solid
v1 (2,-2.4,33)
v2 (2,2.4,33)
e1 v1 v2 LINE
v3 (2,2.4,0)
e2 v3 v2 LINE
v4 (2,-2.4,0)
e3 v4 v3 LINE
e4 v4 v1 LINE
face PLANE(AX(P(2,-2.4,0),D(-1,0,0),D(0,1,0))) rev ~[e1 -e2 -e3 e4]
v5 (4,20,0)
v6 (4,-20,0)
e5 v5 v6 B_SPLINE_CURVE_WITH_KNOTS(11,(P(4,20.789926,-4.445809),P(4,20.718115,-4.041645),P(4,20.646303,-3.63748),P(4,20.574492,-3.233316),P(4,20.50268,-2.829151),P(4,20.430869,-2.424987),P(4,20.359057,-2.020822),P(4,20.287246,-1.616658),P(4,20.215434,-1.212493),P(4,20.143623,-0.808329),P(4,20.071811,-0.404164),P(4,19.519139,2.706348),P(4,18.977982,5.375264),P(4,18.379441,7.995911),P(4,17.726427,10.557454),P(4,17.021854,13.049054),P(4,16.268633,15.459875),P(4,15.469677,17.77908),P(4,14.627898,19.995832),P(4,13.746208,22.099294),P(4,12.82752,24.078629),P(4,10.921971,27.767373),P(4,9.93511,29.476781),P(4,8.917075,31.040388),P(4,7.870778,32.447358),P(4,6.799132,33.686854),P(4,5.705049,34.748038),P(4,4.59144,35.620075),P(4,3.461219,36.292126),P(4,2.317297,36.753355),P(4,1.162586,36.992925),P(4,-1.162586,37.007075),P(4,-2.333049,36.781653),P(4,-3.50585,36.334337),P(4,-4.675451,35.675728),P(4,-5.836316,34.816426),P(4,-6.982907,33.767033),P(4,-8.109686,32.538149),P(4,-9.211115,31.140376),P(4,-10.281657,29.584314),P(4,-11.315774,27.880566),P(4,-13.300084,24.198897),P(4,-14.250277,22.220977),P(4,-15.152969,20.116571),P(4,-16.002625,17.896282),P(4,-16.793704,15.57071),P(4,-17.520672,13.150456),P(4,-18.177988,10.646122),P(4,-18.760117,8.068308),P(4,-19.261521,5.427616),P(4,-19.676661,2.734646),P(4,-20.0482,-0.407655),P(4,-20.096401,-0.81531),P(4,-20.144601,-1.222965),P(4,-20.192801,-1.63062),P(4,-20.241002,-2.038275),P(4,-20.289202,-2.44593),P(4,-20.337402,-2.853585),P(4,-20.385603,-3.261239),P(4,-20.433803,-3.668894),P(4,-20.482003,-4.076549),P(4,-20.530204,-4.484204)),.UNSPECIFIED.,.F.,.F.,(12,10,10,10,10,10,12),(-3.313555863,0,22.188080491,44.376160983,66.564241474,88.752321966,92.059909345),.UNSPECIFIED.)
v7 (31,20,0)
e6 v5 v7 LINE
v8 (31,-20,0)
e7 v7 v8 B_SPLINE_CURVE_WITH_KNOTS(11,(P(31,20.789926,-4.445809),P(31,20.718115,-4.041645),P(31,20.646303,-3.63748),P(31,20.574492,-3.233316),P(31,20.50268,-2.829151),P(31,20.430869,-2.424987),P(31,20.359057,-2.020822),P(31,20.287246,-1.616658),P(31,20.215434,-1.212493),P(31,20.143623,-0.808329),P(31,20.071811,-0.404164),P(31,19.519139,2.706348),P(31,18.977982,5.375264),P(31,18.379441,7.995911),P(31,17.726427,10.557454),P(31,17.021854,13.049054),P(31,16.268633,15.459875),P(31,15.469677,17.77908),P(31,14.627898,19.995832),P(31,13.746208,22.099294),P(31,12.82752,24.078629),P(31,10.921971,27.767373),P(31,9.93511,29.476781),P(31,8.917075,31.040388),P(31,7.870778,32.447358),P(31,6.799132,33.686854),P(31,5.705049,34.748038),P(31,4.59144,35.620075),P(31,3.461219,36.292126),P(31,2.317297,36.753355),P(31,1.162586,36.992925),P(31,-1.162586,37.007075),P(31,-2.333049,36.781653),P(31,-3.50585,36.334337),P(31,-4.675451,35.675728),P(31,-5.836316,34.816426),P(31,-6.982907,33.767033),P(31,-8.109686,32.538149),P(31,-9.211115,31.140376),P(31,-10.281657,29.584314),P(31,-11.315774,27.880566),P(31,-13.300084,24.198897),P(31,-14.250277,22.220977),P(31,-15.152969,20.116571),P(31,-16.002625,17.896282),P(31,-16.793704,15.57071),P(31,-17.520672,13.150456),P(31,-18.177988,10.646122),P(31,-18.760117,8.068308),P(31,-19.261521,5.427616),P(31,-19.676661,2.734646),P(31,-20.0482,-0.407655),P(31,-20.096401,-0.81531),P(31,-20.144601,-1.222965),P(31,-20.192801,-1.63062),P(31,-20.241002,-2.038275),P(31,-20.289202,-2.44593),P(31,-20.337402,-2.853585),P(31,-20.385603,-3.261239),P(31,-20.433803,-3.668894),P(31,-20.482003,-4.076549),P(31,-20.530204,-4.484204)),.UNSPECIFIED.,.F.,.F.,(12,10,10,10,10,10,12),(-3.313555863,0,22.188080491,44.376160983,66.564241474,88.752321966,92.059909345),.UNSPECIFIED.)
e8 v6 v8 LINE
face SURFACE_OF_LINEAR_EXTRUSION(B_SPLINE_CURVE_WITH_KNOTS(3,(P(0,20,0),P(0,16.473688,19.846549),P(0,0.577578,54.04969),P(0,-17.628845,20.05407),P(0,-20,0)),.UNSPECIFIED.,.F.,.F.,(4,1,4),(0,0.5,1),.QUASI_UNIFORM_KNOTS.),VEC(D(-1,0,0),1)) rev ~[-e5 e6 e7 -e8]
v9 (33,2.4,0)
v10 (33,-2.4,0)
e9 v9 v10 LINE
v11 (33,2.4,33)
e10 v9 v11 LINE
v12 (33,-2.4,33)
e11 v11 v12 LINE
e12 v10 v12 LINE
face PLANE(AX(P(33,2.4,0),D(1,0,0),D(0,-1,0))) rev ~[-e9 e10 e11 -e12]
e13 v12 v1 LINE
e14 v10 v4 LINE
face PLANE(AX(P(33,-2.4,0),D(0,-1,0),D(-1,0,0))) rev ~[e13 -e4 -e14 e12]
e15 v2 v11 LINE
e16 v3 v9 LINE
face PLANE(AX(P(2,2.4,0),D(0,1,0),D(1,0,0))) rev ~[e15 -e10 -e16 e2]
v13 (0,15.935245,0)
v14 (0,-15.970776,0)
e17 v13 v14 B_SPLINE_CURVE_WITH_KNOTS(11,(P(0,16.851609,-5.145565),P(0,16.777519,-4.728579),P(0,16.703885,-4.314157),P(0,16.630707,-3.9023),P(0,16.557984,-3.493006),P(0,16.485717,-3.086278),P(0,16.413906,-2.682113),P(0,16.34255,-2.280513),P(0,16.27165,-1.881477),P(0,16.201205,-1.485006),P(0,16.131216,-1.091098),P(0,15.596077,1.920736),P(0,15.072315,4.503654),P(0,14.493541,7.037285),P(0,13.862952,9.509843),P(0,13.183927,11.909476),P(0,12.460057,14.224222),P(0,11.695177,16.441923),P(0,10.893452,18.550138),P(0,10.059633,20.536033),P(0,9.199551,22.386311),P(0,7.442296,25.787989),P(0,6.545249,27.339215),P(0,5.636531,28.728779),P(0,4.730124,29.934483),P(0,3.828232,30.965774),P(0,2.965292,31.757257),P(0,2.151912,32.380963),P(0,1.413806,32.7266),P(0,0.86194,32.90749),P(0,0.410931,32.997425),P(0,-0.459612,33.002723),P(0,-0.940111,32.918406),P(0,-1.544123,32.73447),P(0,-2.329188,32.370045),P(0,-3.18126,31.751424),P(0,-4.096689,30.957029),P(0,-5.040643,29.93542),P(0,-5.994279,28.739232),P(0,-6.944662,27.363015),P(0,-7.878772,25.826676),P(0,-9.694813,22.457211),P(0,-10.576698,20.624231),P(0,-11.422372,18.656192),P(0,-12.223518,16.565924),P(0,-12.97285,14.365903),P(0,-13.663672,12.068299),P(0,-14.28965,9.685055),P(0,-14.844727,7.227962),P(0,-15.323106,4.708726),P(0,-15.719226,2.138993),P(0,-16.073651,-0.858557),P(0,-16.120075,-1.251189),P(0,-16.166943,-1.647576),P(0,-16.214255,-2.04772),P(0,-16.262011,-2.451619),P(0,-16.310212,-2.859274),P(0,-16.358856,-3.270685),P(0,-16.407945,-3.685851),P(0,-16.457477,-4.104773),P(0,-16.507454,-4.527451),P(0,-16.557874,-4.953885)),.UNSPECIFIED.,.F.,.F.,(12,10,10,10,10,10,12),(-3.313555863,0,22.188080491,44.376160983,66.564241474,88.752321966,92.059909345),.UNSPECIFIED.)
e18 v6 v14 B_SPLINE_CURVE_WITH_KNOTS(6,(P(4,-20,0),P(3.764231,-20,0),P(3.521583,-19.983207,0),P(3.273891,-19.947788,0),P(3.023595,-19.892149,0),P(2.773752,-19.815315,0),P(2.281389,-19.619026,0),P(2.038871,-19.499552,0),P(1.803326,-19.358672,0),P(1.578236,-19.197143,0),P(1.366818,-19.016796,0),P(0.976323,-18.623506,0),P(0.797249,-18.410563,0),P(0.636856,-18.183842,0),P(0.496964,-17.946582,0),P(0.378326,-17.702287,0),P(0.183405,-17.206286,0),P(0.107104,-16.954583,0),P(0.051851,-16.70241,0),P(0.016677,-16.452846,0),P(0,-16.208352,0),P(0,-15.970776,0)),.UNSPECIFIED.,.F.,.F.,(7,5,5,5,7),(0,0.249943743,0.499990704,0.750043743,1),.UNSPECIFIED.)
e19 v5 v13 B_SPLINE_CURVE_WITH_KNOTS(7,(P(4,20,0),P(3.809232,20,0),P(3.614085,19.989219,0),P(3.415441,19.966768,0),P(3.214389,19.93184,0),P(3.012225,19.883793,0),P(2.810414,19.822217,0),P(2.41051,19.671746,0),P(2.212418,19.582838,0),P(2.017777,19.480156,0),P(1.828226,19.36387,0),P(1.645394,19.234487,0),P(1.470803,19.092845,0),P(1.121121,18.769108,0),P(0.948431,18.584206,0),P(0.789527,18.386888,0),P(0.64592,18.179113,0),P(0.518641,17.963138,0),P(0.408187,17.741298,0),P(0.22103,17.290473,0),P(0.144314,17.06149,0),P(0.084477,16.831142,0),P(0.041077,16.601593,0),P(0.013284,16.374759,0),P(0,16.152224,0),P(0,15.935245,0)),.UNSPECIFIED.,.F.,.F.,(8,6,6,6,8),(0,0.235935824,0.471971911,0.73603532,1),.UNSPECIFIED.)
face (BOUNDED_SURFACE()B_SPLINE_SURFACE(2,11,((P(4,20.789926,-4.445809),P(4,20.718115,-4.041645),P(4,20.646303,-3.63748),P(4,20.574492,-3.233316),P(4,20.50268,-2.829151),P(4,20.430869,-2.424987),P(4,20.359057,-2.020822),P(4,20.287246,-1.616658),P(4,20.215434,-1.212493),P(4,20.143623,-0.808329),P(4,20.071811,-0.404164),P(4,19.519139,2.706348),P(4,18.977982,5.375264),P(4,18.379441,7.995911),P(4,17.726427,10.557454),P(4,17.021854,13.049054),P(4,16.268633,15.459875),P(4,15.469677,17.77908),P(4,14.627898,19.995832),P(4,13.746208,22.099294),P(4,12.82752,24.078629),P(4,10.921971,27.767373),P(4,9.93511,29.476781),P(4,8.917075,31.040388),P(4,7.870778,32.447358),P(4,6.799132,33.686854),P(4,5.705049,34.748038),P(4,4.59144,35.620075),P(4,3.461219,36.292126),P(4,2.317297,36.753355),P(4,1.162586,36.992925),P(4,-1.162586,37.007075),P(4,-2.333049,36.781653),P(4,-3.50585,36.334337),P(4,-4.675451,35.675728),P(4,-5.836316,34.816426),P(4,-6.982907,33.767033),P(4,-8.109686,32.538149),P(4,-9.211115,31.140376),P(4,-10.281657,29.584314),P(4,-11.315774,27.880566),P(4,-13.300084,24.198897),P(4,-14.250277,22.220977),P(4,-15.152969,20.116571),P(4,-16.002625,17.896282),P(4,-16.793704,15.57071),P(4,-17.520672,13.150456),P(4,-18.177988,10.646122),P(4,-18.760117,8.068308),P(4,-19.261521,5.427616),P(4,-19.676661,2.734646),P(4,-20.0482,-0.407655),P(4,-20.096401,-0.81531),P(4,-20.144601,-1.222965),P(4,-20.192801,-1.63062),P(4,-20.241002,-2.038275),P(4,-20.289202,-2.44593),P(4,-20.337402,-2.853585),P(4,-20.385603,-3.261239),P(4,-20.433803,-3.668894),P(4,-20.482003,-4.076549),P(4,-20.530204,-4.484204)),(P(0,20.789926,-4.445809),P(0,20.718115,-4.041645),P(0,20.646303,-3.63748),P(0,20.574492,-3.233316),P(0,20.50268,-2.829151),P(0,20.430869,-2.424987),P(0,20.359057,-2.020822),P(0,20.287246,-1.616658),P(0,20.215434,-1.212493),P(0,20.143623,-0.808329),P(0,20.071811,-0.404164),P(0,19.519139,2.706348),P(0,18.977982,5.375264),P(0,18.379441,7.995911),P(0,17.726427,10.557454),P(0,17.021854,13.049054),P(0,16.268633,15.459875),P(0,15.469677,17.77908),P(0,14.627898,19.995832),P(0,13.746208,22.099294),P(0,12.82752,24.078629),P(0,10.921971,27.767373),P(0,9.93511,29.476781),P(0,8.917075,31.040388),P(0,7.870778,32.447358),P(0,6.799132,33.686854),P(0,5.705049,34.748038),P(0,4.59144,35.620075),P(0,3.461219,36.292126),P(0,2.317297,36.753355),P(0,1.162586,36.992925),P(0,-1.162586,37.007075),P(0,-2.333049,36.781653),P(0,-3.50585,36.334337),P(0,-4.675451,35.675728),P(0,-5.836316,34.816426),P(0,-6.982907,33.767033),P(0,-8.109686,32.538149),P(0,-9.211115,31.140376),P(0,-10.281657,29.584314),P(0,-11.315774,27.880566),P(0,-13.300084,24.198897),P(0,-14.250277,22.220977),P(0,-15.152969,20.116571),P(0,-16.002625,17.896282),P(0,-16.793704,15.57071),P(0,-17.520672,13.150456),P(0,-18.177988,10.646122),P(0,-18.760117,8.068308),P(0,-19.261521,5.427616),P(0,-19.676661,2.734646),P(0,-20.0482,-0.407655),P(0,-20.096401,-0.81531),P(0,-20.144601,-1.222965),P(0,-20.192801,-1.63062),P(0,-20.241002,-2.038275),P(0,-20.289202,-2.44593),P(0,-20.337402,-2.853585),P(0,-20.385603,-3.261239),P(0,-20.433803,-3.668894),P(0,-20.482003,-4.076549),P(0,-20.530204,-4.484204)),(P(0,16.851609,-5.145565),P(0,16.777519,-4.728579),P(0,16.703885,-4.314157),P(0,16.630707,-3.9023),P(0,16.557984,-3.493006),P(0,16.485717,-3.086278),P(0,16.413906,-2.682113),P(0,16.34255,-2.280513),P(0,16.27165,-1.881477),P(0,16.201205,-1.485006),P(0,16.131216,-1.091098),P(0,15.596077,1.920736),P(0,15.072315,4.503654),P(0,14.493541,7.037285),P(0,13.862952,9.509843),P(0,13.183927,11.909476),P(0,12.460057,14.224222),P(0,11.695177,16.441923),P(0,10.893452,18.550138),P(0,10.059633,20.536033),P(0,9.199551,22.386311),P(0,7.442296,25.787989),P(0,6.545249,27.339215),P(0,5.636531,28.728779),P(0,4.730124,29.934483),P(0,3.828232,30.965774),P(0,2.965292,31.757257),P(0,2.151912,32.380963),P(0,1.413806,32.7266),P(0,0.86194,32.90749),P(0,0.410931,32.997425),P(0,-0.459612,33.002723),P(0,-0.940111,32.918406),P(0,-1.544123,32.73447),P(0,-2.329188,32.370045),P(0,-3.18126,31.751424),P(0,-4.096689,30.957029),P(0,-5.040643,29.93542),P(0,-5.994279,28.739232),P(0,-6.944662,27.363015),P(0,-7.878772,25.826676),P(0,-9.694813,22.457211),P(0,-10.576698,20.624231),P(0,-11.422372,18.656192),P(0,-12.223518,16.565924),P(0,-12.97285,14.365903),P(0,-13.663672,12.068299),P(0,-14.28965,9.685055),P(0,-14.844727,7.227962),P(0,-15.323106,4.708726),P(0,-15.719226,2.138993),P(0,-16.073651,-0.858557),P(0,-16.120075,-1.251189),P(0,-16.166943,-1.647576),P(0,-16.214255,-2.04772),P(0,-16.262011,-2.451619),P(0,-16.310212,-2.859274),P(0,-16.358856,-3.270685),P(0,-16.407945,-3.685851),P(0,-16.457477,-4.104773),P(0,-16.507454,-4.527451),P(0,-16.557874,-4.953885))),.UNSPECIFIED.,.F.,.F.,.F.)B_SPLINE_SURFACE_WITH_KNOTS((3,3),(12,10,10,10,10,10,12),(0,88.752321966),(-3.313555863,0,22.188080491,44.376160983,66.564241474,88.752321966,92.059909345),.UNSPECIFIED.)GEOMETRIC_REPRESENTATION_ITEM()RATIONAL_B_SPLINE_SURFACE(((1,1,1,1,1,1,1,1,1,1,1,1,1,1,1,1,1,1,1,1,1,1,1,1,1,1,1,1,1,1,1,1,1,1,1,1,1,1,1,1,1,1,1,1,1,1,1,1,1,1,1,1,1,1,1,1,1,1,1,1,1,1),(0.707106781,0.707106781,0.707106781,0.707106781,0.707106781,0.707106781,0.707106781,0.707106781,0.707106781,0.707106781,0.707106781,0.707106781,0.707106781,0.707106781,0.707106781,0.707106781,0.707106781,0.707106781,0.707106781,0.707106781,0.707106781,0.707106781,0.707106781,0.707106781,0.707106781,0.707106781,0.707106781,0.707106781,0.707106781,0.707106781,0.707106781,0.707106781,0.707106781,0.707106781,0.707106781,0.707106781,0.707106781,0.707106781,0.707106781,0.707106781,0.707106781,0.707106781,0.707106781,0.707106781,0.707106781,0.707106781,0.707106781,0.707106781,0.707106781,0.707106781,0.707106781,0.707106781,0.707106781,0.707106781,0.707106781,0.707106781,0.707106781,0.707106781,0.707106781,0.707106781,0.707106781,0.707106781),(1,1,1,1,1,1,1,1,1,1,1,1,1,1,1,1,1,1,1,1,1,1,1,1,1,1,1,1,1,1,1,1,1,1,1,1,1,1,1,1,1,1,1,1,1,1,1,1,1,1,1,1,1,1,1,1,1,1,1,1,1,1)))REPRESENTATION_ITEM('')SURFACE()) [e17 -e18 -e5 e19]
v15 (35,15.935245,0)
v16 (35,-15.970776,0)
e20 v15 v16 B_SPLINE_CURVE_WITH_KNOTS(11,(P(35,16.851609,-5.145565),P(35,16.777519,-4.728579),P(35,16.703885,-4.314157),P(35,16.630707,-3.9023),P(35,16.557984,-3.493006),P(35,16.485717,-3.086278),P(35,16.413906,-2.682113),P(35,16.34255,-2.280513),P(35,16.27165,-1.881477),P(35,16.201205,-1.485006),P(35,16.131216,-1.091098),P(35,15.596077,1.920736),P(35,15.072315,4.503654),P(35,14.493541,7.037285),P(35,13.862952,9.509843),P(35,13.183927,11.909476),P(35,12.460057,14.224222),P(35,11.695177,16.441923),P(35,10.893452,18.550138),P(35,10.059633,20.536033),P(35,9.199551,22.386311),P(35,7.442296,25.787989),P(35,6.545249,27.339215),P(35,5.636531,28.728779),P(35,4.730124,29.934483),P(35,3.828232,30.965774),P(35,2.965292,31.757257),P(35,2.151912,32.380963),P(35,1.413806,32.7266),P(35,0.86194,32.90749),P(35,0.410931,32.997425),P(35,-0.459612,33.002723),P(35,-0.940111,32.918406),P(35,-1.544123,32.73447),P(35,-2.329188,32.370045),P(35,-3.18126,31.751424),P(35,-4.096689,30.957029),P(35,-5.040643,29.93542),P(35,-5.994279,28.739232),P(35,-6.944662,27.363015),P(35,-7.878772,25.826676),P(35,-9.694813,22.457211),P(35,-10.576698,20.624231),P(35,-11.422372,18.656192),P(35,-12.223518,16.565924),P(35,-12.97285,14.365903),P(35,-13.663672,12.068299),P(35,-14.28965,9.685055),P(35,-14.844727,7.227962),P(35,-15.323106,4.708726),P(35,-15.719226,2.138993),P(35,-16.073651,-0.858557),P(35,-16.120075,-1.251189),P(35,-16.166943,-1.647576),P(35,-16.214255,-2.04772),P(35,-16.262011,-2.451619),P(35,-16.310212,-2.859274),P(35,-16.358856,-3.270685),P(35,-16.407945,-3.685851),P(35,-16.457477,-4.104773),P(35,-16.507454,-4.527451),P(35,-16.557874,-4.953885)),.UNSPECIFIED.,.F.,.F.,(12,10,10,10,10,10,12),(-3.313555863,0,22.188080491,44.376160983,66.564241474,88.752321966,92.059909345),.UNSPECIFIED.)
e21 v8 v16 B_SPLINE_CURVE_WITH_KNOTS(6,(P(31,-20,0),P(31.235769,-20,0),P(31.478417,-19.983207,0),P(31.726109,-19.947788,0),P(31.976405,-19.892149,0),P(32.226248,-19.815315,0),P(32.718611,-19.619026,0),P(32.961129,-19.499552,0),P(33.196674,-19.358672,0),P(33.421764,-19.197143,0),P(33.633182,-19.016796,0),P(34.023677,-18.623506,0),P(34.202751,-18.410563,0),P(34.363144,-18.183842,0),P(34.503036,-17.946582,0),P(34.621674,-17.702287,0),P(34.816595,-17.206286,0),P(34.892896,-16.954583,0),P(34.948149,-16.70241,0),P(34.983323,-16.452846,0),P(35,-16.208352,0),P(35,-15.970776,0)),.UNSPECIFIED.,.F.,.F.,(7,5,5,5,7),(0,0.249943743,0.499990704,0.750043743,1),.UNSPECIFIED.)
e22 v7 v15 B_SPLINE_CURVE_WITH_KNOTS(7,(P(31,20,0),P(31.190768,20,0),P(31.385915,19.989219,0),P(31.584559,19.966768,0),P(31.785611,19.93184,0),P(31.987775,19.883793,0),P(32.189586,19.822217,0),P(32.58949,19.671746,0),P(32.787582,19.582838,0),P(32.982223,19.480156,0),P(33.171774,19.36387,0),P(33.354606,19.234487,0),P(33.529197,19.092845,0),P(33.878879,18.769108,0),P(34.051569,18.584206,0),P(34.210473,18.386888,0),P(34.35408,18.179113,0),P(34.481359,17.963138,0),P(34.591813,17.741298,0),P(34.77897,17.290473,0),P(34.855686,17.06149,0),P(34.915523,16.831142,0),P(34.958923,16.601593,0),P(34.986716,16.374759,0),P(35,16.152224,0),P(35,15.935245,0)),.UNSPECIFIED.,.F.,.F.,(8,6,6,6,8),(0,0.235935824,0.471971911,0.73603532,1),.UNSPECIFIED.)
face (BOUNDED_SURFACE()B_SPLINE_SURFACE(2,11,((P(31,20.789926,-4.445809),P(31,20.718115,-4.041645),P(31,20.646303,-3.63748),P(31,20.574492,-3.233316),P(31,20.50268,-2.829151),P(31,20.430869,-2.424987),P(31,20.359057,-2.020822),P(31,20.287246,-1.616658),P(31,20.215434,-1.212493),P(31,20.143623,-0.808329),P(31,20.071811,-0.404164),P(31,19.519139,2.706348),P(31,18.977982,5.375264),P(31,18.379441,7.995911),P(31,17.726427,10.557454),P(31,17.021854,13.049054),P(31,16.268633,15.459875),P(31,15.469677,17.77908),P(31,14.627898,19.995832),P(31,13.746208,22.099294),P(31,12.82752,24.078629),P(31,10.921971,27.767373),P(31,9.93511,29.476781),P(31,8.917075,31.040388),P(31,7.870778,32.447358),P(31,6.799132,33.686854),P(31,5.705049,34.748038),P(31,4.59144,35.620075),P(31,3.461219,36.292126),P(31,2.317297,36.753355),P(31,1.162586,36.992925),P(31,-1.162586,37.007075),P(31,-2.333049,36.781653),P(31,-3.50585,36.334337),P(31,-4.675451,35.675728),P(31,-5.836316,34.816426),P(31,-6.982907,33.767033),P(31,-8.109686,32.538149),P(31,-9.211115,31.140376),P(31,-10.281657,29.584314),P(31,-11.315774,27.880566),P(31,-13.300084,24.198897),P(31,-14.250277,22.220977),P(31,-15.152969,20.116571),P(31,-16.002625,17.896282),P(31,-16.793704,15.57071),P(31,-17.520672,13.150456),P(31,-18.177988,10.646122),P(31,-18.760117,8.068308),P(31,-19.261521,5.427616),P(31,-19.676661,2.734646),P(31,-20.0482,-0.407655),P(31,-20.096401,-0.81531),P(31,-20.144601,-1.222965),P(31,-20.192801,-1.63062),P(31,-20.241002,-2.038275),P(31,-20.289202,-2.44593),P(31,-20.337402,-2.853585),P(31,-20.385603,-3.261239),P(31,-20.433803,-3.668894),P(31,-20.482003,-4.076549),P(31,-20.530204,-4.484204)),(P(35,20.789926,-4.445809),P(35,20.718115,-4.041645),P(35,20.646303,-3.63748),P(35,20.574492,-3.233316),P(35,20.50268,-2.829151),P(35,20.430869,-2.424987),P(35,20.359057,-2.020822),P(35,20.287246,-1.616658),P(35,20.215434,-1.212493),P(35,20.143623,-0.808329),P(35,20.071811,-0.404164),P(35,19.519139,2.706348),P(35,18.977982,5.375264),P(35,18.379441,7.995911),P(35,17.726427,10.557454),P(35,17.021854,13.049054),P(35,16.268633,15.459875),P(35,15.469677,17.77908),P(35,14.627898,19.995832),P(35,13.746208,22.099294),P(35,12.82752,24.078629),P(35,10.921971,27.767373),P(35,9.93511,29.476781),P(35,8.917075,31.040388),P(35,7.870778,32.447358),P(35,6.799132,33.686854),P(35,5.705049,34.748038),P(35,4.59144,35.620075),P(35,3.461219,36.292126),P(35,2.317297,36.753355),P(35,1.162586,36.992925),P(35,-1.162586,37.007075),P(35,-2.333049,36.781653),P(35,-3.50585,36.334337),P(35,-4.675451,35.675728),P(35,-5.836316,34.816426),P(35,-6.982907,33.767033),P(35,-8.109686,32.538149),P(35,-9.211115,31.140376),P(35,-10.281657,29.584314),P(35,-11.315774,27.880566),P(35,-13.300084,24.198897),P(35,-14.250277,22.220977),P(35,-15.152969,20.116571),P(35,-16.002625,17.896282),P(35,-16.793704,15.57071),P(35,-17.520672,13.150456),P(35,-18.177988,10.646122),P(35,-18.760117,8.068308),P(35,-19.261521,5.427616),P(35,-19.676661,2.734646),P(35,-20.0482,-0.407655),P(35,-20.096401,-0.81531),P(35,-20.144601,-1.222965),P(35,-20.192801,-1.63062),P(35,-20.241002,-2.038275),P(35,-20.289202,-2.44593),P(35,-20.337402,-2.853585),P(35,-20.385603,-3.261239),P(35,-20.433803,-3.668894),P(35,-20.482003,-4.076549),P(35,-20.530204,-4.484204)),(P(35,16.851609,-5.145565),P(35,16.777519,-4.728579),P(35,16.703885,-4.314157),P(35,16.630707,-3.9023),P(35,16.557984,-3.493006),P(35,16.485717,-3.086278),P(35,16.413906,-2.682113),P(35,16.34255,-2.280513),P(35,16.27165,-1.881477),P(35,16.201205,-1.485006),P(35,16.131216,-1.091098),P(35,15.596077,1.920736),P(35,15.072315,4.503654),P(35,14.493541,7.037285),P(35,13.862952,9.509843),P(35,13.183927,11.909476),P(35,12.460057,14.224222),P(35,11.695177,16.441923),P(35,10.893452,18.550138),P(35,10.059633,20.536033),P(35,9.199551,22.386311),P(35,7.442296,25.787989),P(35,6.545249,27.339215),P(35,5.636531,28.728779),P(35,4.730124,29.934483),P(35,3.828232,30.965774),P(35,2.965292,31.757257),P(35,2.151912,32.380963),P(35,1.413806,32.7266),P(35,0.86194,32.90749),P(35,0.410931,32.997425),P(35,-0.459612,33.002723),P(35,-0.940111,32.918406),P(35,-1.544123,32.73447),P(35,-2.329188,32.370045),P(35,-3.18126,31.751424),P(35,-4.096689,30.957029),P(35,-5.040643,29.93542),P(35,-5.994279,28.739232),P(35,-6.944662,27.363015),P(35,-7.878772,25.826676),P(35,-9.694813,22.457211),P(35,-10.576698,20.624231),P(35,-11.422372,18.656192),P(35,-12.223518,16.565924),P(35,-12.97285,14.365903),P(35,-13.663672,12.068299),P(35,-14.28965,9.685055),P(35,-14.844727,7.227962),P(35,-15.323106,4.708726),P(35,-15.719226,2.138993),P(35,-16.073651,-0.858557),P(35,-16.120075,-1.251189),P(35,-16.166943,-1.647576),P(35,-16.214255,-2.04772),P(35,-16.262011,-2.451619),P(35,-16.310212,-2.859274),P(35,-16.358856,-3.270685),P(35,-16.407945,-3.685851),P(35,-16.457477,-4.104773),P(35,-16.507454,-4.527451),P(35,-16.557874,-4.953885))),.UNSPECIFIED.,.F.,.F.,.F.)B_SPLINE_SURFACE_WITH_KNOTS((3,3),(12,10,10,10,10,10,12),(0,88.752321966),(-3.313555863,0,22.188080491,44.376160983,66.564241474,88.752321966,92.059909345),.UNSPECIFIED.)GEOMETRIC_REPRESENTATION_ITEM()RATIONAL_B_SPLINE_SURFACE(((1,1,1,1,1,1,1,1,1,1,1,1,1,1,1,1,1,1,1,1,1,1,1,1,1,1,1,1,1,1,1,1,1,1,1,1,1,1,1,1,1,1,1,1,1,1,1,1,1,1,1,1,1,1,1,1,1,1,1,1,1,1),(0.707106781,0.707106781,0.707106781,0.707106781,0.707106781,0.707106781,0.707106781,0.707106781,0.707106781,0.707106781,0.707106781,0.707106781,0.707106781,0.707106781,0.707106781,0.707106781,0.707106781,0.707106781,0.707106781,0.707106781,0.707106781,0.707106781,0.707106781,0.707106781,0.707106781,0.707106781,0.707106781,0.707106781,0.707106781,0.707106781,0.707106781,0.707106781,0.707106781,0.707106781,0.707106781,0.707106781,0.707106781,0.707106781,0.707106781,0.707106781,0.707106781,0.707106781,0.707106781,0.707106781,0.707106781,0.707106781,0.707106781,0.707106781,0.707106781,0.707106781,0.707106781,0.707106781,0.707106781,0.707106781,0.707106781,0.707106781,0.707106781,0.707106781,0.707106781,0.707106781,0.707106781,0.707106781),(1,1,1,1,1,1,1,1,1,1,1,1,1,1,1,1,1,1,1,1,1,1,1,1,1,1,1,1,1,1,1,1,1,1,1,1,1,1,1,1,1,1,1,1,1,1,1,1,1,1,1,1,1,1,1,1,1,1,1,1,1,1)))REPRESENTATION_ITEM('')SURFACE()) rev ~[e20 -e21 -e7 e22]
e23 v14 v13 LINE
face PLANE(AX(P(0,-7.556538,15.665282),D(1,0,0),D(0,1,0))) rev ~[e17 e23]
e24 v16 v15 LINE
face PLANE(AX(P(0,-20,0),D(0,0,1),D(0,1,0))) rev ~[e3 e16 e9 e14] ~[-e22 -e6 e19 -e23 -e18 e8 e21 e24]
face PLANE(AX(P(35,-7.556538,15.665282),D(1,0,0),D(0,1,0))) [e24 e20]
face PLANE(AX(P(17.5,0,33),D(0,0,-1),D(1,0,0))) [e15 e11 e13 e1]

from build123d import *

# Parameters (mm, degrees)
F4_DEPTH = 35
F6_DEPTH = 33
F7_R     = 4


# Not quite as in the source:
# - a feature names something its author has since deleted; it is built from what else it names


with BuildPart() as f4:
    # F3 (on Right) → F4 (new body)
    with BuildSketch(Plane.YZ):
        with BuildLine():
            Line((-20, 0), (0, 0))
            Line((0, 0), (0, 37))
            add(Edge.make_bspline(
                [(0, 37), (-8.5256332532, 37.0518802553), (-17.6288448274, 20.054070279), (-20, 0)],
                knots=[0.5, 0.5, 0.5, 0.5, 1, 1, 1, 1], degree=3))
        make_face()
        with BuildLine():
            Line((0, 37), (0, 0))
            Line((0, 0), (20, 0))
            add(Edge.make_bspline(
                [(20, 0), (16.4736881852, 19.8465492576), (8.5256332532, 36.9481197447), (0, 37)],
                knots=[0, 0, 0, 0, 0.5, 0.5, 0.5, 0.5], degree=3))
        make_face()
    extrude(amount=F4_DEPTH)

    # F5 (on face) → F6 (cut)
    with BuildSketch(Plane(origin=(0, 0, 0), x_dir=(1, 0, 0), z_dir=(0, 0, -1))):
        Polygon((2, 2.4), (2, 0), (2, -2.4), (33, -2.4), (33, 0), (33, 2.4), align=None)
    extrude(amount=-F6_DEPTH, mode=Mode.SUBTRACT)

    # F7
    f7_edges = [f4.edges().sort_by_distance(p)[0] for p in [
        (35, -0.138558, 36.999345),
        (0, -0.138558, 36.999345),
    ]]
    fillet(f7_edges, radius=F7_R)


solid = f4.part
